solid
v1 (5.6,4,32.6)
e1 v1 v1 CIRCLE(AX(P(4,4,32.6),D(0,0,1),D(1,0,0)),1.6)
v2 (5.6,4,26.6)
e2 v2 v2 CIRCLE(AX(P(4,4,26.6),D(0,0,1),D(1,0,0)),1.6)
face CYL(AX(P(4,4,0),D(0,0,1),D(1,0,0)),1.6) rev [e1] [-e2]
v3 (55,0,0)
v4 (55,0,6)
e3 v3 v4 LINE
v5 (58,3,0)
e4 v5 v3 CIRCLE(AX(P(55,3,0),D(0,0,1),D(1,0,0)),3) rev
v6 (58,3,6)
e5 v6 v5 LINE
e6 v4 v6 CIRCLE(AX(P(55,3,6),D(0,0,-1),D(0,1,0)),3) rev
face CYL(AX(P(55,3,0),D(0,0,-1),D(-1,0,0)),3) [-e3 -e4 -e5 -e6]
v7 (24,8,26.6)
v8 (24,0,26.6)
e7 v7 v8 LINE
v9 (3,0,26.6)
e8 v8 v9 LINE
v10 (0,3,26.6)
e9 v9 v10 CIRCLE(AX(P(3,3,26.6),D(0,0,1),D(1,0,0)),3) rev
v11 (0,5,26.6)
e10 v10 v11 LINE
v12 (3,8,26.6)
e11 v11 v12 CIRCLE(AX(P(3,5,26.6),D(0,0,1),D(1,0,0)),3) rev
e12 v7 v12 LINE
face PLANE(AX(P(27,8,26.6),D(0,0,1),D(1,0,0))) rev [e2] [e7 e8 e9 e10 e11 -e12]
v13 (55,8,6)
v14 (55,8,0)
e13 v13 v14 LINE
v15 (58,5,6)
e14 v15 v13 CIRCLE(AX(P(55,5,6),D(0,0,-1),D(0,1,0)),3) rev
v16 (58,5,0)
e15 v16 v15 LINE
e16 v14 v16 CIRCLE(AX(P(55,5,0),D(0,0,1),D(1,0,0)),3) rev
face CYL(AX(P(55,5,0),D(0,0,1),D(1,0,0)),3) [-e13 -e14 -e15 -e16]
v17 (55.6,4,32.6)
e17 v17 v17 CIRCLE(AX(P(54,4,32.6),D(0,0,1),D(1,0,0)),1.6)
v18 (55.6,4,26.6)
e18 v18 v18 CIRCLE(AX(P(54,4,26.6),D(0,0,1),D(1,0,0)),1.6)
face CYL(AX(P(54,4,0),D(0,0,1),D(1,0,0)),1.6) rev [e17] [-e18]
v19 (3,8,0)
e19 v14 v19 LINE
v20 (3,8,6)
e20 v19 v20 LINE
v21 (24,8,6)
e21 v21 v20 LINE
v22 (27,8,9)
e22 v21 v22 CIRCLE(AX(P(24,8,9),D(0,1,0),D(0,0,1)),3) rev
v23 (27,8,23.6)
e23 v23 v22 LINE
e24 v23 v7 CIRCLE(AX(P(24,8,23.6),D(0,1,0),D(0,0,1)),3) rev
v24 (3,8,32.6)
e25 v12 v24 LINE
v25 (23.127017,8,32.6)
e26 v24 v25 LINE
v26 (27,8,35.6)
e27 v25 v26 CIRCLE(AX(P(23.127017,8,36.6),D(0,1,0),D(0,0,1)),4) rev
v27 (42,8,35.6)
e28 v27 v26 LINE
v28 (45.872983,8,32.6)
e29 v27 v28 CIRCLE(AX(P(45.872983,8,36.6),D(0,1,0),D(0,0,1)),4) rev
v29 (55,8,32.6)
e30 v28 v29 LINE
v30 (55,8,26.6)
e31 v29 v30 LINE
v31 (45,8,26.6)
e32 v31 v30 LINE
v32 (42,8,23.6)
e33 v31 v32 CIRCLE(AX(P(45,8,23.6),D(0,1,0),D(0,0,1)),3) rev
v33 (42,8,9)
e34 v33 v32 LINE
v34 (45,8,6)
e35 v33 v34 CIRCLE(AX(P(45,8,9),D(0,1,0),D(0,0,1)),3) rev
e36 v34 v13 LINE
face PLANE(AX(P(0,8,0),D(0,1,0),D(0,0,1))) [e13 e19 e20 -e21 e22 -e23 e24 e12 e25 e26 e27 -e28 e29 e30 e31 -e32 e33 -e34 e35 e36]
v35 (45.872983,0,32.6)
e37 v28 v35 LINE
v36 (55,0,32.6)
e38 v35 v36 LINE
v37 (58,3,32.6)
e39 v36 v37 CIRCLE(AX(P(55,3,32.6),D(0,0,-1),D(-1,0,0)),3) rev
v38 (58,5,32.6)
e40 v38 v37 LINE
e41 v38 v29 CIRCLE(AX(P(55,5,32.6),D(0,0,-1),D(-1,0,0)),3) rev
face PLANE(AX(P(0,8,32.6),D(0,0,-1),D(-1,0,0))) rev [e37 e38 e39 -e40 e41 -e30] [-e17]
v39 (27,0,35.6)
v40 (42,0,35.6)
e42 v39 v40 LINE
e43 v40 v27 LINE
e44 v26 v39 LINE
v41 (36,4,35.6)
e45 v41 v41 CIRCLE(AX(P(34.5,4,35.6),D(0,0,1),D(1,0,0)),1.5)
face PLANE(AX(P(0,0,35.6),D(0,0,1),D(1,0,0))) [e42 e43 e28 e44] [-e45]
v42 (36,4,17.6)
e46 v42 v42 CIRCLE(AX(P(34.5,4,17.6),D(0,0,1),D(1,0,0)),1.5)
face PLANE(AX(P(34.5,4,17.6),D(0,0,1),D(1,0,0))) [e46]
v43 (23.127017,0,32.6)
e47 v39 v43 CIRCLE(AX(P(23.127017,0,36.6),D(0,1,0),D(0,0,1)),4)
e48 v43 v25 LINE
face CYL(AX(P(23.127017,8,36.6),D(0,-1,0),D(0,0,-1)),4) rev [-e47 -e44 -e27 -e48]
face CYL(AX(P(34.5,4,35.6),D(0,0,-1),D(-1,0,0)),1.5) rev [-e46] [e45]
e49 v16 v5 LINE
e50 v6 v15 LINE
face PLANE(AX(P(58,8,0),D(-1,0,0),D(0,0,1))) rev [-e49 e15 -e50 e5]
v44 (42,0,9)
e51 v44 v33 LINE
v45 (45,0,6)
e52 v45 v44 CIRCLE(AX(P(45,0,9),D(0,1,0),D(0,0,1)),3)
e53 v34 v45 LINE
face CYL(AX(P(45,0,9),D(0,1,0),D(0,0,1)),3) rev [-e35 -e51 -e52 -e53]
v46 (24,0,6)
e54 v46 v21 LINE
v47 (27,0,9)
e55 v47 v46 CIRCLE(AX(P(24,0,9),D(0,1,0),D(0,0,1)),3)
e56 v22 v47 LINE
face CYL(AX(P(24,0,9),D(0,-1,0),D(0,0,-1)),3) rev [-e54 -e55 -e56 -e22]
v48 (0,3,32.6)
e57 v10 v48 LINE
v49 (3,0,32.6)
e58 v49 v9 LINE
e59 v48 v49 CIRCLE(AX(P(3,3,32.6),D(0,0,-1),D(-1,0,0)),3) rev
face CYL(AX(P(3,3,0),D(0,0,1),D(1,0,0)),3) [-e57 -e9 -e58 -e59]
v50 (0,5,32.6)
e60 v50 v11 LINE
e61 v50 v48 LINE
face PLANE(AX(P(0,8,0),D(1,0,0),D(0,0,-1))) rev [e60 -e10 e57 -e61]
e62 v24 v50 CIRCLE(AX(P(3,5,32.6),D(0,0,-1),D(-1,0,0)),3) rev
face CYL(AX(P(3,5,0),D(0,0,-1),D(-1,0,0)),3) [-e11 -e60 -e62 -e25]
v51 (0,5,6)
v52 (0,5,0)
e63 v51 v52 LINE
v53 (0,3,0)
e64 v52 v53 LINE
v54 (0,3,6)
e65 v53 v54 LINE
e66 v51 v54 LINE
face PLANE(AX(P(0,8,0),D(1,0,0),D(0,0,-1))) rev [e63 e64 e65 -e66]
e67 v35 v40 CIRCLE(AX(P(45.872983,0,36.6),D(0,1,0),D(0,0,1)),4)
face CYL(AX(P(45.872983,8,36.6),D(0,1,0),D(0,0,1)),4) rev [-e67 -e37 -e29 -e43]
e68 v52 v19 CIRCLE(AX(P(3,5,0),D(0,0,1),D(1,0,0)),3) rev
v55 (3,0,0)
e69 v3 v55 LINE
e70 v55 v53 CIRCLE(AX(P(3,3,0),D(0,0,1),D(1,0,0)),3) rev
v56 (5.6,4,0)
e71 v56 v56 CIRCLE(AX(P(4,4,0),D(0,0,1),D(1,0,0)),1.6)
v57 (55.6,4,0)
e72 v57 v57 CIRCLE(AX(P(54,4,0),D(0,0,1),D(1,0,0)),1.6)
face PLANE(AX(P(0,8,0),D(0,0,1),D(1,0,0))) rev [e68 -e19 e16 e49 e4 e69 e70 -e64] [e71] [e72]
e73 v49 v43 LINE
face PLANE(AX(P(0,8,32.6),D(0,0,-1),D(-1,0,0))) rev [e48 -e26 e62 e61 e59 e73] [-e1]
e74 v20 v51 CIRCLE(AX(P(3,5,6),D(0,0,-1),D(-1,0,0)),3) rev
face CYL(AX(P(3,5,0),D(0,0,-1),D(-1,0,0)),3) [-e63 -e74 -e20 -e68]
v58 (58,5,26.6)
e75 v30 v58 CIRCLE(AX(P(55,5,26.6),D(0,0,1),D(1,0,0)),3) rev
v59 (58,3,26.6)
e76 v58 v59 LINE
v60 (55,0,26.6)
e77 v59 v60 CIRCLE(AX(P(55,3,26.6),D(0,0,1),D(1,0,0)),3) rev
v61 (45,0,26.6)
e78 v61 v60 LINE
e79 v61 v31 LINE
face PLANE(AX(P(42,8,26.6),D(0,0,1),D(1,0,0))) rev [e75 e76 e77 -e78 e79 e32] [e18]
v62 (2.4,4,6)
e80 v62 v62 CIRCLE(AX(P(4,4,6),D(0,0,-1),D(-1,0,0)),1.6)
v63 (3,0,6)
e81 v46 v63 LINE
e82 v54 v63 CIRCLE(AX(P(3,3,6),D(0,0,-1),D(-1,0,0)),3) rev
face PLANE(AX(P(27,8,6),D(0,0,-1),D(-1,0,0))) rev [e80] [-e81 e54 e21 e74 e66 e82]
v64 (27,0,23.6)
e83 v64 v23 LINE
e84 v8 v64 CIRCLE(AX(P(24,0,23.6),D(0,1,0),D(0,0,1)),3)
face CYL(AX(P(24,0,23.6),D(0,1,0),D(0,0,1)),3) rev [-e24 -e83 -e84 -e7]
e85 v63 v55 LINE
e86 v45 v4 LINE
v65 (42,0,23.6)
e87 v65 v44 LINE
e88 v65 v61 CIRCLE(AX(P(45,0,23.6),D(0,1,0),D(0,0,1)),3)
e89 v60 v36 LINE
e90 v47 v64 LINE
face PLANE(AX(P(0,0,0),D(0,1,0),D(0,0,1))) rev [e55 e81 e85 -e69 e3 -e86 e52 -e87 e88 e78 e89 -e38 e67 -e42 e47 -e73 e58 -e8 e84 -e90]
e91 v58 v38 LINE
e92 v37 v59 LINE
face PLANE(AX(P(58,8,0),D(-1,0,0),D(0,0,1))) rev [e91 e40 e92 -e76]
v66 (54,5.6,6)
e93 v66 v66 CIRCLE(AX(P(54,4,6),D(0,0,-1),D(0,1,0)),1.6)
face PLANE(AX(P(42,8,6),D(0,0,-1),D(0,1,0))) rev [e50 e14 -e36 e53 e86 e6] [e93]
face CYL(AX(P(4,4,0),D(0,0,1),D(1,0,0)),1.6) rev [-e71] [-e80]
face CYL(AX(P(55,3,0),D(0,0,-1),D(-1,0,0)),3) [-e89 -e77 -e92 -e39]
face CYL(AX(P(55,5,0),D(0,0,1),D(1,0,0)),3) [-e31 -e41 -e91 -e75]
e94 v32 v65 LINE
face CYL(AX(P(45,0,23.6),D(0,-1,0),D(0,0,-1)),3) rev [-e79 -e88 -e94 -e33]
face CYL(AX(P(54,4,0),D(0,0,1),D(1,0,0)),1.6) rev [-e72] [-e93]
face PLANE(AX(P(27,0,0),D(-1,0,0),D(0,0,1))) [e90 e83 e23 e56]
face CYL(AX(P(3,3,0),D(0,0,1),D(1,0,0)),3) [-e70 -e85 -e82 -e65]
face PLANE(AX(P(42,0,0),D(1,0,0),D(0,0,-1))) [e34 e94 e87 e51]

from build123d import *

# Parameters (mm, degrees)
SKETCH1_W               = 58
SKETCH1_H               = 32.6
BOSS_EXTRUDE1_DEPTH     = 8
SKETCH2_W               = 20.6
SKETCH2_H               = 8
CUT_EXTRUDE1_DEPTH      = 16
SKETCH3_W               = 20.6
SKETCH3_H               = 8
CUT_EXTRUDE2_DEPTH      = 27
SKETCH5_R               = 1.6
CUT_EXTRUDE4_DEPTH      = 68.013133041
FILLET1_R               = 3
FILLET2_R               = 3
SKETCH7_W               = 15
SKETCH7_H               = 8
BOSS_EXTRUDE2_DEPTH     = 3
CUT_EXTRUDE5_DEPTH      = 3
CUT_EXTRUDE5_DEPTH_BACK = 15
SKETCH6_R               = 1.5
FILLET3_R               = 4


with BuildPart() as part:
    # Sketch1 → Boss-Extrude1 (new body)
    with BuildSketch(Plane(origin=(0, 0, 0), x_dir=(1, 0, 0), z_dir=(0, 1, 0))):
        with Locations((29, -16.3)):
            Rectangle(SKETCH1_W, SKETCH1_H)
    extrude(amount=BOSS_EXTRUDE1_DEPTH)

    # Sketch2 → Cut-Extrude1 (cut)
    with BuildSketch(Plane(origin=(58, 0, 0), x_dir=(0, 0, -1), z_dir=(1, 0, 0))):
        with Locations((-16.3, 4)):
            Rectangle(SKETCH2_W, SKETCH2_H)
    extrude(amount=-CUT_EXTRUDE1_DEPTH, mode=Mode.SUBTRACT)

    # Sketch3 → Cut-Extrude2 (cut)
    with BuildSketch(Plane.ZY):
        with Locations((16.3, 4)):
            Rectangle(SKETCH3_W, SKETCH3_H)
    extrude(amount=-CUT_EXTRUDE2_DEPTH, mode=Mode.SUBTRACT)

    # Sketch5 → Cut-Extrude4 (cut, through all)
    with BuildSketch(Plane.XY.offset(32.6)):
        with Locations((4, 4)):
            Circle(SKETCH5_R)
        with Locations((54, 4)):
            Circle(SKETCH5_R)
    extrude(amount=-CUT_EXTRUDE4_DEPTH, mode=Mode.SUBTRACT)

    # Fillet1
    fillet1_edges = [part.edges().sort_by_distance(p)[0] for p in [
        (58, 8, 29.6),
        (58, 0, 3),
        (58, 8, 3),
        (0, 0, 29.6),
        (0, 8, 29.6),
        (0, 8, 3),
        (58, 0, 29.6),
        (0, 0, 3),
    ]]
    fillet(fillet1_edges, radius=FILLET1_R)

    # Fillet2
    fillet2_edges = [part.edges().sort_by_distance(p)[0] for p in [
        (42, 4, 26.6),
        (42, 4, 6),
        (27, 4, 6),
        (27, 4, 26.6),
    ]]
    fillet(fillet2_edges, radius=FILLET2_R)

    # Sketch7 → Boss-Extrude2 (add)
    with BuildSketch(Plane.XY.offset(32.6)):
        with Locations((34.5, 4)):
            Rectangle(SKETCH7_W, SKETCH7_H)
    extrude(amount=BOSS_EXTRUDE2_DEPTH)

    # Sketch6 → Cut-Extrude5 (cut, two sides: drawn at the far end of the back side and taken through both)
    with BuildSketch(Plane.XY.offset(32.6).offset(-CUT_EXTRUDE5_DEPTH_BACK)):
        with Locations((34.5, 4)):
            Circle(SKETCH6_R)
    extrude(amount=CUT_EXTRUDE5_DEPTH + CUT_EXTRUDE5_DEPTH_BACK, mode=Mode.SUBTRACT)

    # Fillet3
    # the kernel refuses this fillet: 4 mm, written as the material it adds along each edge
    with BuildSketch(Plane(origin=(42, 8, 32.6), x_dir=(0, 0, 1), z_dir=(0, -1, 0))) as fillet3_piece_1:
        with BuildLine():
            CenterArc((4, -3.872983346), FILLET3_R, 104.477512186, 75.522487814)
            Line((0, -3.872983346), (-0.08, -3.872983346))
            Line((-0.08, -3.872983346), (-0.08, 0))
            Line((-0.08, 0), (0, 0.08))
            ThreePointArc((0, 0.08), (1.5, 0.08), (2.98, 0.077459667))
            Line((2.98, 0.077459667), (3, 0))
        make_face()
    extrude(amount=8)
    with BuildSketch(Plane(origin=(27, 0, 32.6), x_dir=(-1, 0, 0), z_dir=(0, 1, 0))) as fillet3_piece_2:
        with BuildLine():
            CenterArc((3.872983346, 4), FILLET3_R, 194.477512186, 75.522487814)
            Line((0, 3), (-0.077459667, 2.98))
            ThreePointArc((-0.077459667, 2.98), (-0.08, 1.5), (-0.08, 0))
            Line((-0.08, 0), (0, -0.08))
            Line((0, -0.08), (3.872983346, -0.08))
            Line((3.872983346, -0.08), (3.872983346, 0))
        make_face()
    extrude(amount=8)


solid = part.part
